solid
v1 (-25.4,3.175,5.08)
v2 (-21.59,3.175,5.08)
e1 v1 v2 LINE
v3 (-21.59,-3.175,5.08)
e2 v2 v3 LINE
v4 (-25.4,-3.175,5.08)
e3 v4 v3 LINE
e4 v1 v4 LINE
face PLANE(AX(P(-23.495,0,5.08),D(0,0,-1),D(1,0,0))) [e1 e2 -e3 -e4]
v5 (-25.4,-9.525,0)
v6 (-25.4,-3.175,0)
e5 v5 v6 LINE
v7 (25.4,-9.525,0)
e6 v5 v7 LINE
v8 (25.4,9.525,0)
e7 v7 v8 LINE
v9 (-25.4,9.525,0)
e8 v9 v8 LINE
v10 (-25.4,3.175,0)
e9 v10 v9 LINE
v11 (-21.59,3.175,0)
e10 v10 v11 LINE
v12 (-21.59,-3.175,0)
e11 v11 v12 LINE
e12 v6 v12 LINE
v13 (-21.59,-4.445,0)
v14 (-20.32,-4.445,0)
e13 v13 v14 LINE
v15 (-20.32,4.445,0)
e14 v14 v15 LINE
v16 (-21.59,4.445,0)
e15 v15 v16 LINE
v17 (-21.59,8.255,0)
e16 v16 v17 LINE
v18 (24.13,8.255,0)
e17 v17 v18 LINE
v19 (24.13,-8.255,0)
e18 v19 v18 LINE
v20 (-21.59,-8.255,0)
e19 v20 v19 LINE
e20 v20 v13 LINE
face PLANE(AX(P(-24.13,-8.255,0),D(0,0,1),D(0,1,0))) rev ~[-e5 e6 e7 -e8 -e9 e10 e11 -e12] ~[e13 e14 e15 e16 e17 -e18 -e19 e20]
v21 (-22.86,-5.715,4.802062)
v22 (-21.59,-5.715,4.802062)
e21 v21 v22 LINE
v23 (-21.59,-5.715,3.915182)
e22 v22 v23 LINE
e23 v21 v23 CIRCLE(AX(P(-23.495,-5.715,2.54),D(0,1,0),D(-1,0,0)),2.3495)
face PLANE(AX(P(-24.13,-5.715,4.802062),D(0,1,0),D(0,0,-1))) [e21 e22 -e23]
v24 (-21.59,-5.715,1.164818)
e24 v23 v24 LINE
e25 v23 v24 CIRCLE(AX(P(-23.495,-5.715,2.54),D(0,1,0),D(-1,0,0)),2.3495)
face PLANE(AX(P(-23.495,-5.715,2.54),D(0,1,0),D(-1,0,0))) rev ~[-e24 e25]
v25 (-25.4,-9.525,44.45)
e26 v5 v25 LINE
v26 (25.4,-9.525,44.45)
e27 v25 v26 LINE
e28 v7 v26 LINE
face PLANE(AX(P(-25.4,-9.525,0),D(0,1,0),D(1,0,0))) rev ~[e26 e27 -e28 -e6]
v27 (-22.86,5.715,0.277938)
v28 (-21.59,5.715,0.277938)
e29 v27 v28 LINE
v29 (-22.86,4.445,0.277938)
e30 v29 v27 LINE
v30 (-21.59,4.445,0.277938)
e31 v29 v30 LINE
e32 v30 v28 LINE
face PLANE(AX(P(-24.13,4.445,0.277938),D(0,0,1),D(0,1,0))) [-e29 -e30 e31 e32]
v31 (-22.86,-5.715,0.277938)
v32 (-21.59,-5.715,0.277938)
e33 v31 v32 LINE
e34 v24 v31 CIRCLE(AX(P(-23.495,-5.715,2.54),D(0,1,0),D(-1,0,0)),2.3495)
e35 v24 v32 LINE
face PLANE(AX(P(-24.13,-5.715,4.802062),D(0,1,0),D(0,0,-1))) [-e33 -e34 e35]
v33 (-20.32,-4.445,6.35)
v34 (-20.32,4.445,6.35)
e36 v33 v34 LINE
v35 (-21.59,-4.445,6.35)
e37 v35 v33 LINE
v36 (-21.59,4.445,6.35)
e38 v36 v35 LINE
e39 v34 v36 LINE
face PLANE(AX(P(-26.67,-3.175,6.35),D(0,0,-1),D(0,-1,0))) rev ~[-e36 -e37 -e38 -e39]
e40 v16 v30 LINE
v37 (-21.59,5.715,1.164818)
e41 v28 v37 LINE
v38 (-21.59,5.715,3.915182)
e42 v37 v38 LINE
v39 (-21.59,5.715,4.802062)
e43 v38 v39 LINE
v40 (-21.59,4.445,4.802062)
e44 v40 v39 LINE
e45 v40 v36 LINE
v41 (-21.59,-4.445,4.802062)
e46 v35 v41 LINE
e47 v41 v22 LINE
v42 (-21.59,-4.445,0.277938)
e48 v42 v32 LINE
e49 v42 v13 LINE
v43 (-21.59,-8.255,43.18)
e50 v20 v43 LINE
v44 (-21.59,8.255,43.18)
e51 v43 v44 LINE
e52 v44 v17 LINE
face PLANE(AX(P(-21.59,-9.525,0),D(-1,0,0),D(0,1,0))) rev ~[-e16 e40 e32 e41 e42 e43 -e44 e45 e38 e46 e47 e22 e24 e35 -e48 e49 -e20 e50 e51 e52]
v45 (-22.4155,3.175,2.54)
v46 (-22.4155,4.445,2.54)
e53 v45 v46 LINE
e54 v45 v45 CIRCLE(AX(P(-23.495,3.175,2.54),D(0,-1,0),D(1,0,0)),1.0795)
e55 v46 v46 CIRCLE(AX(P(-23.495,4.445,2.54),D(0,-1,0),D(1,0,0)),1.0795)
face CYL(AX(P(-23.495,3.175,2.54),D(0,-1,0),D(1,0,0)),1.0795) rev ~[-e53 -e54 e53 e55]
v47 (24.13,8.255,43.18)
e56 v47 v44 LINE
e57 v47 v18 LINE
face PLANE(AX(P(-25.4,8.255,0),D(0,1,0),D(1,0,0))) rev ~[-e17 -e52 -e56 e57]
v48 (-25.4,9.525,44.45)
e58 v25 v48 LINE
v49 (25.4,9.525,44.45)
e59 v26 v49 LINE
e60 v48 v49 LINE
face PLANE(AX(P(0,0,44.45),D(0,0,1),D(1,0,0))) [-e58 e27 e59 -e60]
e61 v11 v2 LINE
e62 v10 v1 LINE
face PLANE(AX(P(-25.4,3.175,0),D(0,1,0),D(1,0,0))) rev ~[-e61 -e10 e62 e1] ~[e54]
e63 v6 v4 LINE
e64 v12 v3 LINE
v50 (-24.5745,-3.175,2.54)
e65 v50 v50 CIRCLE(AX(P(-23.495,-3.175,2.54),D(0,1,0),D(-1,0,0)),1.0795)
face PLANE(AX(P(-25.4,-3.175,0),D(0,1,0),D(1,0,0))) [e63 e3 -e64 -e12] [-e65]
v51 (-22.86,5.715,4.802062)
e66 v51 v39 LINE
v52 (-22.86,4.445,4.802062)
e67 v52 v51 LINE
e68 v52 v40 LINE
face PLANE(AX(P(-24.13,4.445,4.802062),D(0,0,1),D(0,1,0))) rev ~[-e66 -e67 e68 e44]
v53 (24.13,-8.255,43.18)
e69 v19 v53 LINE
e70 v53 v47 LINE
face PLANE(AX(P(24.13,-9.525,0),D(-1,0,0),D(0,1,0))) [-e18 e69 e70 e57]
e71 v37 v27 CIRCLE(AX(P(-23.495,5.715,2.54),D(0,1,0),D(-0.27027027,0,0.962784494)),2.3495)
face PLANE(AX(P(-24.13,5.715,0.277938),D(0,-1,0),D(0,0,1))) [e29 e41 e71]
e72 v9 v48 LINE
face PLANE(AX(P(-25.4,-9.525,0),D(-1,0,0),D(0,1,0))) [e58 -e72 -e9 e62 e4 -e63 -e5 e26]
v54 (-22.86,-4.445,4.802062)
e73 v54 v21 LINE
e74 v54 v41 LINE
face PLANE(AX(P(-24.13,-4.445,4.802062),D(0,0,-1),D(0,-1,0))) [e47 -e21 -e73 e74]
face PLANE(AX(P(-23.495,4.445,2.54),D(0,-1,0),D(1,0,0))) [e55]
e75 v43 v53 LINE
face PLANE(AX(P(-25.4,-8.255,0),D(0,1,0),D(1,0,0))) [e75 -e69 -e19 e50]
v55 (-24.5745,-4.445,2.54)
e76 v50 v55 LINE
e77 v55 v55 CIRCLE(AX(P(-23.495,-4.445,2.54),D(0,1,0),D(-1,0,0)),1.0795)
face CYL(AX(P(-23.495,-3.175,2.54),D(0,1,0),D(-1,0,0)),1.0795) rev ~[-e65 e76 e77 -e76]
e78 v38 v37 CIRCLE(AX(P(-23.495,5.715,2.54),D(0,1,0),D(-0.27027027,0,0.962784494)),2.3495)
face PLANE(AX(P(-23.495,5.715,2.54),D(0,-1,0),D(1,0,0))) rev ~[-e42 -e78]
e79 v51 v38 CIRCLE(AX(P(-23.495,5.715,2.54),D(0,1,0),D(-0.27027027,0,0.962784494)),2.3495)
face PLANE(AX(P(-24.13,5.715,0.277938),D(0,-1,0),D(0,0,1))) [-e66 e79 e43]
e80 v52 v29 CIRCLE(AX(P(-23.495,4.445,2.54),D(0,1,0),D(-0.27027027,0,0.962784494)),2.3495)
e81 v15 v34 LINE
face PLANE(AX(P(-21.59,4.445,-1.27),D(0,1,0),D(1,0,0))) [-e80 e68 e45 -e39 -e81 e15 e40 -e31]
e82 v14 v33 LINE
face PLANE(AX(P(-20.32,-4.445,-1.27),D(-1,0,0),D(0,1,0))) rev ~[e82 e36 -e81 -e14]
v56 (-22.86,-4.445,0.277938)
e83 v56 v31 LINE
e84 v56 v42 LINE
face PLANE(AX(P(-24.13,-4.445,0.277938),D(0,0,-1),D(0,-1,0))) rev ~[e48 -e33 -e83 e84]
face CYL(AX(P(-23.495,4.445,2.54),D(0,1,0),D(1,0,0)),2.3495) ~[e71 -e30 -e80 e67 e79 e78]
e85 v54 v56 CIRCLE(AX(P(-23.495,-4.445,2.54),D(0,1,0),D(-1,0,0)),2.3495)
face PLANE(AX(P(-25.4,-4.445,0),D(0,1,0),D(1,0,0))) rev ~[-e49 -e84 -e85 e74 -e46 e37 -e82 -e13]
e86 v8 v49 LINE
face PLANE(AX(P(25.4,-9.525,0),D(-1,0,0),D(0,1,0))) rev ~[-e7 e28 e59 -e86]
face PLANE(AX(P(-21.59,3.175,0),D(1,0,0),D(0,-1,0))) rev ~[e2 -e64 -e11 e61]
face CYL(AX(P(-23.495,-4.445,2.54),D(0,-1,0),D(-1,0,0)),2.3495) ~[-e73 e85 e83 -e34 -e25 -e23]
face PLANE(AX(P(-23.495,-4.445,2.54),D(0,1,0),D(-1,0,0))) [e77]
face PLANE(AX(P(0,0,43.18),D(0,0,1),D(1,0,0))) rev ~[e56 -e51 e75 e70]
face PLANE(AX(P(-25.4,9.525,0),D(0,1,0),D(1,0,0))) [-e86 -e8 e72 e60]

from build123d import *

# Parameters (mm, degrees)
F0_W        = 50.8
F0_H        = 19.05
F1_DEPTH    = 44.45
F2_W        = 3.81
F2_H        = 6.35
F3_DEPTH    = 5.08
F4_R        = 1.0795
F5_DEPTH    = 1.27
F6_R        = 1.0795
F7_DEPTH    = 1.27
F8_T        = 1.27
F8_T3_DEPTH = 6.35
F8_T5_DEPTH = 7.62
F8_T7_DEPTH = 8.89
F9_DEPTH    = 2.54


# Not quite as in the source:
# - a shell that OpenCascade refuses in one call is made with other operations: the cavity is built on its own and cut out


with BuildPart() as f1:
    # F0 (on Top) → F1 (new body)
    with BuildSketch(Plane.XY):
        Rectangle(F0_W, F0_H)
    extrude(amount=F1_DEPTH)

    # F2 (on face) → F3 (cut)
    with BuildSketch(Plane(origin=(0, 0, 0), x_dir=(1, 0, 0), z_dir=(0, 0, -1))):
        with Locations((-23.495, 0)):
            Rectangle(F2_W, F2_H)
    extrude(amount=-F3_DEPTH, mode=Mode.SUBTRACT)

    # F4 (on face) → F5 (cut)
    with BuildSketch(Plane.XZ.offset(-3.175)):
        with Locations((-23.495, 2.54)):
            Circle(F4_R)
    extrude(amount=-F5_DEPTH, mode=Mode.SUBTRACT)

    # F6 (on face) → F7 (cut)
    with BuildSketch(Plane(origin=(0, -3.175, 0), x_dir=(-1, 0, 0), z_dir=(0, 1, 0))):
        with Locations((23.495, 2.54)):
            Circle(F6_R)
    extrude(amount=-F7_DEPTH, mode=Mode.SUBTRACT)

    # F8: shell of thickness 1.27, made by hand


with BuildPart() as f8_core1:
    # F8_t2: copy of F1
    add(f1.part)

    # the walls: a layer under each face that stays
    f8_faces = [f8_core1.faces().sort_by_distance(p)[0] for p in [
        (0, -9.525, 22.225),
        (-25.4, 0, 22.225),
        (25.4, 0, 22.225),
        (0, 0, 44.45),
        (-24.765, 3.175, 4.2333333333),
        (-23.495, 0, 5.08),
        (-22.225, -3.175, 4.2333333333),
        (0, 9.525, 22.225),
        (-21.59, 0, 2.54),
        (-24.5745, 3.81, 2.54),
        (-22.4155, -3.81, 2.54),
        (-23.495, 4.445, 2.54),
        (-23.495, -4.445, 2.54),
    ]]
    thicken(f8_faces, amount=-F8_T, mode=Mode.SUBTRACT)

    # F8_s4 → F8_t3 (cut)
    with BuildSketch(Plane.YZ.offset(-26.67)):
        Polygon((3.1623, 5.0673), (4.445, 5.08), (4.445, 6.35), (3.175, 6.35), align=None)
        Polygon((-3.1623, 5.0673), (-3.175, 6.35), (-4.445, 6.35), (-4.445, 5.08), align=None)
    extrude(amount=F8_T3_DEPTH, mode=Mode.SUBTRACT)

    # F8_s6 → F8_t5 (cut)
    with BuildSketch(Plane.XY.offset(-1.27)):
        Polygon((-21.6027, 3.1623), (-21.59, 4.445), (-20.32, 4.445), (-20.32, 3.175), align=None)
        Polygon((-21.6027, -3.1623), (-21.59, -4.445), (-20.32, -4.445), (-20.32, -3.175), align=None)
    extrude(amount=F8_T5_DEPTH, mode=Mode.SUBTRACT)

    # F8_s8 → F8_t7 (cut)
    with BuildSketch(Plane.XZ.offset(-4.445)):
        Polygon((-21.6027, 5.0673), (-21.59, 6.35), (-20.32, 6.35), (-20.32, 5.08), align=None)
    extrude(amount=F8_T7_DEPTH, mode=Mode.SUBTRACT)

    # F8_s9 → F8_t10 (revolve, cut)
    with BuildSketch(Plane.XY.offset(2.54)):
        Polygon((-22.4282, 4.4323), (-21.1455, 4.445), (-21.1455, 5.715), (-22.4155, 5.715), align=None)
    revolve(axis=Axis((-23.495, 4.445, 2.54), (0, -1, 0)), mode=Mode.SUBTRACT)

    # F8_s11 → F8_t12 (revolve, cut)
    with BuildSketch(Plane.XY.offset(2.54)):
        Polygon((-24.5618, -4.4323), (-25.8445, -4.445), (-25.8445, -5.715), (-24.5745, -5.715), align=None)
    revolve(axis=Axis((-23.495, -4.445, 2.54), (0, 1, 0)), mode=Mode.SUBTRACT)


with BuildPart() as f1_1:
    add(f1.part)

    # what is left inside the walls is the cavity
    f8_cavity = [f8_core1.part.solids().sort_by_distance(p)[0] for p in [
        (0, -8.2423, 28.786667),
    ]]
    add(f8_cavity, mode=Mode.SUBTRACT)

    # F9 (add): a face of the model
    f9_faces = [f1_1.faces().sort_by_distance(p)[0] for p in [
        (-24.13, 0, 23.5412296588),
    ]]
    extrude(f9_faces, amount=F9_DEPTH)


solid = f1_1.part
